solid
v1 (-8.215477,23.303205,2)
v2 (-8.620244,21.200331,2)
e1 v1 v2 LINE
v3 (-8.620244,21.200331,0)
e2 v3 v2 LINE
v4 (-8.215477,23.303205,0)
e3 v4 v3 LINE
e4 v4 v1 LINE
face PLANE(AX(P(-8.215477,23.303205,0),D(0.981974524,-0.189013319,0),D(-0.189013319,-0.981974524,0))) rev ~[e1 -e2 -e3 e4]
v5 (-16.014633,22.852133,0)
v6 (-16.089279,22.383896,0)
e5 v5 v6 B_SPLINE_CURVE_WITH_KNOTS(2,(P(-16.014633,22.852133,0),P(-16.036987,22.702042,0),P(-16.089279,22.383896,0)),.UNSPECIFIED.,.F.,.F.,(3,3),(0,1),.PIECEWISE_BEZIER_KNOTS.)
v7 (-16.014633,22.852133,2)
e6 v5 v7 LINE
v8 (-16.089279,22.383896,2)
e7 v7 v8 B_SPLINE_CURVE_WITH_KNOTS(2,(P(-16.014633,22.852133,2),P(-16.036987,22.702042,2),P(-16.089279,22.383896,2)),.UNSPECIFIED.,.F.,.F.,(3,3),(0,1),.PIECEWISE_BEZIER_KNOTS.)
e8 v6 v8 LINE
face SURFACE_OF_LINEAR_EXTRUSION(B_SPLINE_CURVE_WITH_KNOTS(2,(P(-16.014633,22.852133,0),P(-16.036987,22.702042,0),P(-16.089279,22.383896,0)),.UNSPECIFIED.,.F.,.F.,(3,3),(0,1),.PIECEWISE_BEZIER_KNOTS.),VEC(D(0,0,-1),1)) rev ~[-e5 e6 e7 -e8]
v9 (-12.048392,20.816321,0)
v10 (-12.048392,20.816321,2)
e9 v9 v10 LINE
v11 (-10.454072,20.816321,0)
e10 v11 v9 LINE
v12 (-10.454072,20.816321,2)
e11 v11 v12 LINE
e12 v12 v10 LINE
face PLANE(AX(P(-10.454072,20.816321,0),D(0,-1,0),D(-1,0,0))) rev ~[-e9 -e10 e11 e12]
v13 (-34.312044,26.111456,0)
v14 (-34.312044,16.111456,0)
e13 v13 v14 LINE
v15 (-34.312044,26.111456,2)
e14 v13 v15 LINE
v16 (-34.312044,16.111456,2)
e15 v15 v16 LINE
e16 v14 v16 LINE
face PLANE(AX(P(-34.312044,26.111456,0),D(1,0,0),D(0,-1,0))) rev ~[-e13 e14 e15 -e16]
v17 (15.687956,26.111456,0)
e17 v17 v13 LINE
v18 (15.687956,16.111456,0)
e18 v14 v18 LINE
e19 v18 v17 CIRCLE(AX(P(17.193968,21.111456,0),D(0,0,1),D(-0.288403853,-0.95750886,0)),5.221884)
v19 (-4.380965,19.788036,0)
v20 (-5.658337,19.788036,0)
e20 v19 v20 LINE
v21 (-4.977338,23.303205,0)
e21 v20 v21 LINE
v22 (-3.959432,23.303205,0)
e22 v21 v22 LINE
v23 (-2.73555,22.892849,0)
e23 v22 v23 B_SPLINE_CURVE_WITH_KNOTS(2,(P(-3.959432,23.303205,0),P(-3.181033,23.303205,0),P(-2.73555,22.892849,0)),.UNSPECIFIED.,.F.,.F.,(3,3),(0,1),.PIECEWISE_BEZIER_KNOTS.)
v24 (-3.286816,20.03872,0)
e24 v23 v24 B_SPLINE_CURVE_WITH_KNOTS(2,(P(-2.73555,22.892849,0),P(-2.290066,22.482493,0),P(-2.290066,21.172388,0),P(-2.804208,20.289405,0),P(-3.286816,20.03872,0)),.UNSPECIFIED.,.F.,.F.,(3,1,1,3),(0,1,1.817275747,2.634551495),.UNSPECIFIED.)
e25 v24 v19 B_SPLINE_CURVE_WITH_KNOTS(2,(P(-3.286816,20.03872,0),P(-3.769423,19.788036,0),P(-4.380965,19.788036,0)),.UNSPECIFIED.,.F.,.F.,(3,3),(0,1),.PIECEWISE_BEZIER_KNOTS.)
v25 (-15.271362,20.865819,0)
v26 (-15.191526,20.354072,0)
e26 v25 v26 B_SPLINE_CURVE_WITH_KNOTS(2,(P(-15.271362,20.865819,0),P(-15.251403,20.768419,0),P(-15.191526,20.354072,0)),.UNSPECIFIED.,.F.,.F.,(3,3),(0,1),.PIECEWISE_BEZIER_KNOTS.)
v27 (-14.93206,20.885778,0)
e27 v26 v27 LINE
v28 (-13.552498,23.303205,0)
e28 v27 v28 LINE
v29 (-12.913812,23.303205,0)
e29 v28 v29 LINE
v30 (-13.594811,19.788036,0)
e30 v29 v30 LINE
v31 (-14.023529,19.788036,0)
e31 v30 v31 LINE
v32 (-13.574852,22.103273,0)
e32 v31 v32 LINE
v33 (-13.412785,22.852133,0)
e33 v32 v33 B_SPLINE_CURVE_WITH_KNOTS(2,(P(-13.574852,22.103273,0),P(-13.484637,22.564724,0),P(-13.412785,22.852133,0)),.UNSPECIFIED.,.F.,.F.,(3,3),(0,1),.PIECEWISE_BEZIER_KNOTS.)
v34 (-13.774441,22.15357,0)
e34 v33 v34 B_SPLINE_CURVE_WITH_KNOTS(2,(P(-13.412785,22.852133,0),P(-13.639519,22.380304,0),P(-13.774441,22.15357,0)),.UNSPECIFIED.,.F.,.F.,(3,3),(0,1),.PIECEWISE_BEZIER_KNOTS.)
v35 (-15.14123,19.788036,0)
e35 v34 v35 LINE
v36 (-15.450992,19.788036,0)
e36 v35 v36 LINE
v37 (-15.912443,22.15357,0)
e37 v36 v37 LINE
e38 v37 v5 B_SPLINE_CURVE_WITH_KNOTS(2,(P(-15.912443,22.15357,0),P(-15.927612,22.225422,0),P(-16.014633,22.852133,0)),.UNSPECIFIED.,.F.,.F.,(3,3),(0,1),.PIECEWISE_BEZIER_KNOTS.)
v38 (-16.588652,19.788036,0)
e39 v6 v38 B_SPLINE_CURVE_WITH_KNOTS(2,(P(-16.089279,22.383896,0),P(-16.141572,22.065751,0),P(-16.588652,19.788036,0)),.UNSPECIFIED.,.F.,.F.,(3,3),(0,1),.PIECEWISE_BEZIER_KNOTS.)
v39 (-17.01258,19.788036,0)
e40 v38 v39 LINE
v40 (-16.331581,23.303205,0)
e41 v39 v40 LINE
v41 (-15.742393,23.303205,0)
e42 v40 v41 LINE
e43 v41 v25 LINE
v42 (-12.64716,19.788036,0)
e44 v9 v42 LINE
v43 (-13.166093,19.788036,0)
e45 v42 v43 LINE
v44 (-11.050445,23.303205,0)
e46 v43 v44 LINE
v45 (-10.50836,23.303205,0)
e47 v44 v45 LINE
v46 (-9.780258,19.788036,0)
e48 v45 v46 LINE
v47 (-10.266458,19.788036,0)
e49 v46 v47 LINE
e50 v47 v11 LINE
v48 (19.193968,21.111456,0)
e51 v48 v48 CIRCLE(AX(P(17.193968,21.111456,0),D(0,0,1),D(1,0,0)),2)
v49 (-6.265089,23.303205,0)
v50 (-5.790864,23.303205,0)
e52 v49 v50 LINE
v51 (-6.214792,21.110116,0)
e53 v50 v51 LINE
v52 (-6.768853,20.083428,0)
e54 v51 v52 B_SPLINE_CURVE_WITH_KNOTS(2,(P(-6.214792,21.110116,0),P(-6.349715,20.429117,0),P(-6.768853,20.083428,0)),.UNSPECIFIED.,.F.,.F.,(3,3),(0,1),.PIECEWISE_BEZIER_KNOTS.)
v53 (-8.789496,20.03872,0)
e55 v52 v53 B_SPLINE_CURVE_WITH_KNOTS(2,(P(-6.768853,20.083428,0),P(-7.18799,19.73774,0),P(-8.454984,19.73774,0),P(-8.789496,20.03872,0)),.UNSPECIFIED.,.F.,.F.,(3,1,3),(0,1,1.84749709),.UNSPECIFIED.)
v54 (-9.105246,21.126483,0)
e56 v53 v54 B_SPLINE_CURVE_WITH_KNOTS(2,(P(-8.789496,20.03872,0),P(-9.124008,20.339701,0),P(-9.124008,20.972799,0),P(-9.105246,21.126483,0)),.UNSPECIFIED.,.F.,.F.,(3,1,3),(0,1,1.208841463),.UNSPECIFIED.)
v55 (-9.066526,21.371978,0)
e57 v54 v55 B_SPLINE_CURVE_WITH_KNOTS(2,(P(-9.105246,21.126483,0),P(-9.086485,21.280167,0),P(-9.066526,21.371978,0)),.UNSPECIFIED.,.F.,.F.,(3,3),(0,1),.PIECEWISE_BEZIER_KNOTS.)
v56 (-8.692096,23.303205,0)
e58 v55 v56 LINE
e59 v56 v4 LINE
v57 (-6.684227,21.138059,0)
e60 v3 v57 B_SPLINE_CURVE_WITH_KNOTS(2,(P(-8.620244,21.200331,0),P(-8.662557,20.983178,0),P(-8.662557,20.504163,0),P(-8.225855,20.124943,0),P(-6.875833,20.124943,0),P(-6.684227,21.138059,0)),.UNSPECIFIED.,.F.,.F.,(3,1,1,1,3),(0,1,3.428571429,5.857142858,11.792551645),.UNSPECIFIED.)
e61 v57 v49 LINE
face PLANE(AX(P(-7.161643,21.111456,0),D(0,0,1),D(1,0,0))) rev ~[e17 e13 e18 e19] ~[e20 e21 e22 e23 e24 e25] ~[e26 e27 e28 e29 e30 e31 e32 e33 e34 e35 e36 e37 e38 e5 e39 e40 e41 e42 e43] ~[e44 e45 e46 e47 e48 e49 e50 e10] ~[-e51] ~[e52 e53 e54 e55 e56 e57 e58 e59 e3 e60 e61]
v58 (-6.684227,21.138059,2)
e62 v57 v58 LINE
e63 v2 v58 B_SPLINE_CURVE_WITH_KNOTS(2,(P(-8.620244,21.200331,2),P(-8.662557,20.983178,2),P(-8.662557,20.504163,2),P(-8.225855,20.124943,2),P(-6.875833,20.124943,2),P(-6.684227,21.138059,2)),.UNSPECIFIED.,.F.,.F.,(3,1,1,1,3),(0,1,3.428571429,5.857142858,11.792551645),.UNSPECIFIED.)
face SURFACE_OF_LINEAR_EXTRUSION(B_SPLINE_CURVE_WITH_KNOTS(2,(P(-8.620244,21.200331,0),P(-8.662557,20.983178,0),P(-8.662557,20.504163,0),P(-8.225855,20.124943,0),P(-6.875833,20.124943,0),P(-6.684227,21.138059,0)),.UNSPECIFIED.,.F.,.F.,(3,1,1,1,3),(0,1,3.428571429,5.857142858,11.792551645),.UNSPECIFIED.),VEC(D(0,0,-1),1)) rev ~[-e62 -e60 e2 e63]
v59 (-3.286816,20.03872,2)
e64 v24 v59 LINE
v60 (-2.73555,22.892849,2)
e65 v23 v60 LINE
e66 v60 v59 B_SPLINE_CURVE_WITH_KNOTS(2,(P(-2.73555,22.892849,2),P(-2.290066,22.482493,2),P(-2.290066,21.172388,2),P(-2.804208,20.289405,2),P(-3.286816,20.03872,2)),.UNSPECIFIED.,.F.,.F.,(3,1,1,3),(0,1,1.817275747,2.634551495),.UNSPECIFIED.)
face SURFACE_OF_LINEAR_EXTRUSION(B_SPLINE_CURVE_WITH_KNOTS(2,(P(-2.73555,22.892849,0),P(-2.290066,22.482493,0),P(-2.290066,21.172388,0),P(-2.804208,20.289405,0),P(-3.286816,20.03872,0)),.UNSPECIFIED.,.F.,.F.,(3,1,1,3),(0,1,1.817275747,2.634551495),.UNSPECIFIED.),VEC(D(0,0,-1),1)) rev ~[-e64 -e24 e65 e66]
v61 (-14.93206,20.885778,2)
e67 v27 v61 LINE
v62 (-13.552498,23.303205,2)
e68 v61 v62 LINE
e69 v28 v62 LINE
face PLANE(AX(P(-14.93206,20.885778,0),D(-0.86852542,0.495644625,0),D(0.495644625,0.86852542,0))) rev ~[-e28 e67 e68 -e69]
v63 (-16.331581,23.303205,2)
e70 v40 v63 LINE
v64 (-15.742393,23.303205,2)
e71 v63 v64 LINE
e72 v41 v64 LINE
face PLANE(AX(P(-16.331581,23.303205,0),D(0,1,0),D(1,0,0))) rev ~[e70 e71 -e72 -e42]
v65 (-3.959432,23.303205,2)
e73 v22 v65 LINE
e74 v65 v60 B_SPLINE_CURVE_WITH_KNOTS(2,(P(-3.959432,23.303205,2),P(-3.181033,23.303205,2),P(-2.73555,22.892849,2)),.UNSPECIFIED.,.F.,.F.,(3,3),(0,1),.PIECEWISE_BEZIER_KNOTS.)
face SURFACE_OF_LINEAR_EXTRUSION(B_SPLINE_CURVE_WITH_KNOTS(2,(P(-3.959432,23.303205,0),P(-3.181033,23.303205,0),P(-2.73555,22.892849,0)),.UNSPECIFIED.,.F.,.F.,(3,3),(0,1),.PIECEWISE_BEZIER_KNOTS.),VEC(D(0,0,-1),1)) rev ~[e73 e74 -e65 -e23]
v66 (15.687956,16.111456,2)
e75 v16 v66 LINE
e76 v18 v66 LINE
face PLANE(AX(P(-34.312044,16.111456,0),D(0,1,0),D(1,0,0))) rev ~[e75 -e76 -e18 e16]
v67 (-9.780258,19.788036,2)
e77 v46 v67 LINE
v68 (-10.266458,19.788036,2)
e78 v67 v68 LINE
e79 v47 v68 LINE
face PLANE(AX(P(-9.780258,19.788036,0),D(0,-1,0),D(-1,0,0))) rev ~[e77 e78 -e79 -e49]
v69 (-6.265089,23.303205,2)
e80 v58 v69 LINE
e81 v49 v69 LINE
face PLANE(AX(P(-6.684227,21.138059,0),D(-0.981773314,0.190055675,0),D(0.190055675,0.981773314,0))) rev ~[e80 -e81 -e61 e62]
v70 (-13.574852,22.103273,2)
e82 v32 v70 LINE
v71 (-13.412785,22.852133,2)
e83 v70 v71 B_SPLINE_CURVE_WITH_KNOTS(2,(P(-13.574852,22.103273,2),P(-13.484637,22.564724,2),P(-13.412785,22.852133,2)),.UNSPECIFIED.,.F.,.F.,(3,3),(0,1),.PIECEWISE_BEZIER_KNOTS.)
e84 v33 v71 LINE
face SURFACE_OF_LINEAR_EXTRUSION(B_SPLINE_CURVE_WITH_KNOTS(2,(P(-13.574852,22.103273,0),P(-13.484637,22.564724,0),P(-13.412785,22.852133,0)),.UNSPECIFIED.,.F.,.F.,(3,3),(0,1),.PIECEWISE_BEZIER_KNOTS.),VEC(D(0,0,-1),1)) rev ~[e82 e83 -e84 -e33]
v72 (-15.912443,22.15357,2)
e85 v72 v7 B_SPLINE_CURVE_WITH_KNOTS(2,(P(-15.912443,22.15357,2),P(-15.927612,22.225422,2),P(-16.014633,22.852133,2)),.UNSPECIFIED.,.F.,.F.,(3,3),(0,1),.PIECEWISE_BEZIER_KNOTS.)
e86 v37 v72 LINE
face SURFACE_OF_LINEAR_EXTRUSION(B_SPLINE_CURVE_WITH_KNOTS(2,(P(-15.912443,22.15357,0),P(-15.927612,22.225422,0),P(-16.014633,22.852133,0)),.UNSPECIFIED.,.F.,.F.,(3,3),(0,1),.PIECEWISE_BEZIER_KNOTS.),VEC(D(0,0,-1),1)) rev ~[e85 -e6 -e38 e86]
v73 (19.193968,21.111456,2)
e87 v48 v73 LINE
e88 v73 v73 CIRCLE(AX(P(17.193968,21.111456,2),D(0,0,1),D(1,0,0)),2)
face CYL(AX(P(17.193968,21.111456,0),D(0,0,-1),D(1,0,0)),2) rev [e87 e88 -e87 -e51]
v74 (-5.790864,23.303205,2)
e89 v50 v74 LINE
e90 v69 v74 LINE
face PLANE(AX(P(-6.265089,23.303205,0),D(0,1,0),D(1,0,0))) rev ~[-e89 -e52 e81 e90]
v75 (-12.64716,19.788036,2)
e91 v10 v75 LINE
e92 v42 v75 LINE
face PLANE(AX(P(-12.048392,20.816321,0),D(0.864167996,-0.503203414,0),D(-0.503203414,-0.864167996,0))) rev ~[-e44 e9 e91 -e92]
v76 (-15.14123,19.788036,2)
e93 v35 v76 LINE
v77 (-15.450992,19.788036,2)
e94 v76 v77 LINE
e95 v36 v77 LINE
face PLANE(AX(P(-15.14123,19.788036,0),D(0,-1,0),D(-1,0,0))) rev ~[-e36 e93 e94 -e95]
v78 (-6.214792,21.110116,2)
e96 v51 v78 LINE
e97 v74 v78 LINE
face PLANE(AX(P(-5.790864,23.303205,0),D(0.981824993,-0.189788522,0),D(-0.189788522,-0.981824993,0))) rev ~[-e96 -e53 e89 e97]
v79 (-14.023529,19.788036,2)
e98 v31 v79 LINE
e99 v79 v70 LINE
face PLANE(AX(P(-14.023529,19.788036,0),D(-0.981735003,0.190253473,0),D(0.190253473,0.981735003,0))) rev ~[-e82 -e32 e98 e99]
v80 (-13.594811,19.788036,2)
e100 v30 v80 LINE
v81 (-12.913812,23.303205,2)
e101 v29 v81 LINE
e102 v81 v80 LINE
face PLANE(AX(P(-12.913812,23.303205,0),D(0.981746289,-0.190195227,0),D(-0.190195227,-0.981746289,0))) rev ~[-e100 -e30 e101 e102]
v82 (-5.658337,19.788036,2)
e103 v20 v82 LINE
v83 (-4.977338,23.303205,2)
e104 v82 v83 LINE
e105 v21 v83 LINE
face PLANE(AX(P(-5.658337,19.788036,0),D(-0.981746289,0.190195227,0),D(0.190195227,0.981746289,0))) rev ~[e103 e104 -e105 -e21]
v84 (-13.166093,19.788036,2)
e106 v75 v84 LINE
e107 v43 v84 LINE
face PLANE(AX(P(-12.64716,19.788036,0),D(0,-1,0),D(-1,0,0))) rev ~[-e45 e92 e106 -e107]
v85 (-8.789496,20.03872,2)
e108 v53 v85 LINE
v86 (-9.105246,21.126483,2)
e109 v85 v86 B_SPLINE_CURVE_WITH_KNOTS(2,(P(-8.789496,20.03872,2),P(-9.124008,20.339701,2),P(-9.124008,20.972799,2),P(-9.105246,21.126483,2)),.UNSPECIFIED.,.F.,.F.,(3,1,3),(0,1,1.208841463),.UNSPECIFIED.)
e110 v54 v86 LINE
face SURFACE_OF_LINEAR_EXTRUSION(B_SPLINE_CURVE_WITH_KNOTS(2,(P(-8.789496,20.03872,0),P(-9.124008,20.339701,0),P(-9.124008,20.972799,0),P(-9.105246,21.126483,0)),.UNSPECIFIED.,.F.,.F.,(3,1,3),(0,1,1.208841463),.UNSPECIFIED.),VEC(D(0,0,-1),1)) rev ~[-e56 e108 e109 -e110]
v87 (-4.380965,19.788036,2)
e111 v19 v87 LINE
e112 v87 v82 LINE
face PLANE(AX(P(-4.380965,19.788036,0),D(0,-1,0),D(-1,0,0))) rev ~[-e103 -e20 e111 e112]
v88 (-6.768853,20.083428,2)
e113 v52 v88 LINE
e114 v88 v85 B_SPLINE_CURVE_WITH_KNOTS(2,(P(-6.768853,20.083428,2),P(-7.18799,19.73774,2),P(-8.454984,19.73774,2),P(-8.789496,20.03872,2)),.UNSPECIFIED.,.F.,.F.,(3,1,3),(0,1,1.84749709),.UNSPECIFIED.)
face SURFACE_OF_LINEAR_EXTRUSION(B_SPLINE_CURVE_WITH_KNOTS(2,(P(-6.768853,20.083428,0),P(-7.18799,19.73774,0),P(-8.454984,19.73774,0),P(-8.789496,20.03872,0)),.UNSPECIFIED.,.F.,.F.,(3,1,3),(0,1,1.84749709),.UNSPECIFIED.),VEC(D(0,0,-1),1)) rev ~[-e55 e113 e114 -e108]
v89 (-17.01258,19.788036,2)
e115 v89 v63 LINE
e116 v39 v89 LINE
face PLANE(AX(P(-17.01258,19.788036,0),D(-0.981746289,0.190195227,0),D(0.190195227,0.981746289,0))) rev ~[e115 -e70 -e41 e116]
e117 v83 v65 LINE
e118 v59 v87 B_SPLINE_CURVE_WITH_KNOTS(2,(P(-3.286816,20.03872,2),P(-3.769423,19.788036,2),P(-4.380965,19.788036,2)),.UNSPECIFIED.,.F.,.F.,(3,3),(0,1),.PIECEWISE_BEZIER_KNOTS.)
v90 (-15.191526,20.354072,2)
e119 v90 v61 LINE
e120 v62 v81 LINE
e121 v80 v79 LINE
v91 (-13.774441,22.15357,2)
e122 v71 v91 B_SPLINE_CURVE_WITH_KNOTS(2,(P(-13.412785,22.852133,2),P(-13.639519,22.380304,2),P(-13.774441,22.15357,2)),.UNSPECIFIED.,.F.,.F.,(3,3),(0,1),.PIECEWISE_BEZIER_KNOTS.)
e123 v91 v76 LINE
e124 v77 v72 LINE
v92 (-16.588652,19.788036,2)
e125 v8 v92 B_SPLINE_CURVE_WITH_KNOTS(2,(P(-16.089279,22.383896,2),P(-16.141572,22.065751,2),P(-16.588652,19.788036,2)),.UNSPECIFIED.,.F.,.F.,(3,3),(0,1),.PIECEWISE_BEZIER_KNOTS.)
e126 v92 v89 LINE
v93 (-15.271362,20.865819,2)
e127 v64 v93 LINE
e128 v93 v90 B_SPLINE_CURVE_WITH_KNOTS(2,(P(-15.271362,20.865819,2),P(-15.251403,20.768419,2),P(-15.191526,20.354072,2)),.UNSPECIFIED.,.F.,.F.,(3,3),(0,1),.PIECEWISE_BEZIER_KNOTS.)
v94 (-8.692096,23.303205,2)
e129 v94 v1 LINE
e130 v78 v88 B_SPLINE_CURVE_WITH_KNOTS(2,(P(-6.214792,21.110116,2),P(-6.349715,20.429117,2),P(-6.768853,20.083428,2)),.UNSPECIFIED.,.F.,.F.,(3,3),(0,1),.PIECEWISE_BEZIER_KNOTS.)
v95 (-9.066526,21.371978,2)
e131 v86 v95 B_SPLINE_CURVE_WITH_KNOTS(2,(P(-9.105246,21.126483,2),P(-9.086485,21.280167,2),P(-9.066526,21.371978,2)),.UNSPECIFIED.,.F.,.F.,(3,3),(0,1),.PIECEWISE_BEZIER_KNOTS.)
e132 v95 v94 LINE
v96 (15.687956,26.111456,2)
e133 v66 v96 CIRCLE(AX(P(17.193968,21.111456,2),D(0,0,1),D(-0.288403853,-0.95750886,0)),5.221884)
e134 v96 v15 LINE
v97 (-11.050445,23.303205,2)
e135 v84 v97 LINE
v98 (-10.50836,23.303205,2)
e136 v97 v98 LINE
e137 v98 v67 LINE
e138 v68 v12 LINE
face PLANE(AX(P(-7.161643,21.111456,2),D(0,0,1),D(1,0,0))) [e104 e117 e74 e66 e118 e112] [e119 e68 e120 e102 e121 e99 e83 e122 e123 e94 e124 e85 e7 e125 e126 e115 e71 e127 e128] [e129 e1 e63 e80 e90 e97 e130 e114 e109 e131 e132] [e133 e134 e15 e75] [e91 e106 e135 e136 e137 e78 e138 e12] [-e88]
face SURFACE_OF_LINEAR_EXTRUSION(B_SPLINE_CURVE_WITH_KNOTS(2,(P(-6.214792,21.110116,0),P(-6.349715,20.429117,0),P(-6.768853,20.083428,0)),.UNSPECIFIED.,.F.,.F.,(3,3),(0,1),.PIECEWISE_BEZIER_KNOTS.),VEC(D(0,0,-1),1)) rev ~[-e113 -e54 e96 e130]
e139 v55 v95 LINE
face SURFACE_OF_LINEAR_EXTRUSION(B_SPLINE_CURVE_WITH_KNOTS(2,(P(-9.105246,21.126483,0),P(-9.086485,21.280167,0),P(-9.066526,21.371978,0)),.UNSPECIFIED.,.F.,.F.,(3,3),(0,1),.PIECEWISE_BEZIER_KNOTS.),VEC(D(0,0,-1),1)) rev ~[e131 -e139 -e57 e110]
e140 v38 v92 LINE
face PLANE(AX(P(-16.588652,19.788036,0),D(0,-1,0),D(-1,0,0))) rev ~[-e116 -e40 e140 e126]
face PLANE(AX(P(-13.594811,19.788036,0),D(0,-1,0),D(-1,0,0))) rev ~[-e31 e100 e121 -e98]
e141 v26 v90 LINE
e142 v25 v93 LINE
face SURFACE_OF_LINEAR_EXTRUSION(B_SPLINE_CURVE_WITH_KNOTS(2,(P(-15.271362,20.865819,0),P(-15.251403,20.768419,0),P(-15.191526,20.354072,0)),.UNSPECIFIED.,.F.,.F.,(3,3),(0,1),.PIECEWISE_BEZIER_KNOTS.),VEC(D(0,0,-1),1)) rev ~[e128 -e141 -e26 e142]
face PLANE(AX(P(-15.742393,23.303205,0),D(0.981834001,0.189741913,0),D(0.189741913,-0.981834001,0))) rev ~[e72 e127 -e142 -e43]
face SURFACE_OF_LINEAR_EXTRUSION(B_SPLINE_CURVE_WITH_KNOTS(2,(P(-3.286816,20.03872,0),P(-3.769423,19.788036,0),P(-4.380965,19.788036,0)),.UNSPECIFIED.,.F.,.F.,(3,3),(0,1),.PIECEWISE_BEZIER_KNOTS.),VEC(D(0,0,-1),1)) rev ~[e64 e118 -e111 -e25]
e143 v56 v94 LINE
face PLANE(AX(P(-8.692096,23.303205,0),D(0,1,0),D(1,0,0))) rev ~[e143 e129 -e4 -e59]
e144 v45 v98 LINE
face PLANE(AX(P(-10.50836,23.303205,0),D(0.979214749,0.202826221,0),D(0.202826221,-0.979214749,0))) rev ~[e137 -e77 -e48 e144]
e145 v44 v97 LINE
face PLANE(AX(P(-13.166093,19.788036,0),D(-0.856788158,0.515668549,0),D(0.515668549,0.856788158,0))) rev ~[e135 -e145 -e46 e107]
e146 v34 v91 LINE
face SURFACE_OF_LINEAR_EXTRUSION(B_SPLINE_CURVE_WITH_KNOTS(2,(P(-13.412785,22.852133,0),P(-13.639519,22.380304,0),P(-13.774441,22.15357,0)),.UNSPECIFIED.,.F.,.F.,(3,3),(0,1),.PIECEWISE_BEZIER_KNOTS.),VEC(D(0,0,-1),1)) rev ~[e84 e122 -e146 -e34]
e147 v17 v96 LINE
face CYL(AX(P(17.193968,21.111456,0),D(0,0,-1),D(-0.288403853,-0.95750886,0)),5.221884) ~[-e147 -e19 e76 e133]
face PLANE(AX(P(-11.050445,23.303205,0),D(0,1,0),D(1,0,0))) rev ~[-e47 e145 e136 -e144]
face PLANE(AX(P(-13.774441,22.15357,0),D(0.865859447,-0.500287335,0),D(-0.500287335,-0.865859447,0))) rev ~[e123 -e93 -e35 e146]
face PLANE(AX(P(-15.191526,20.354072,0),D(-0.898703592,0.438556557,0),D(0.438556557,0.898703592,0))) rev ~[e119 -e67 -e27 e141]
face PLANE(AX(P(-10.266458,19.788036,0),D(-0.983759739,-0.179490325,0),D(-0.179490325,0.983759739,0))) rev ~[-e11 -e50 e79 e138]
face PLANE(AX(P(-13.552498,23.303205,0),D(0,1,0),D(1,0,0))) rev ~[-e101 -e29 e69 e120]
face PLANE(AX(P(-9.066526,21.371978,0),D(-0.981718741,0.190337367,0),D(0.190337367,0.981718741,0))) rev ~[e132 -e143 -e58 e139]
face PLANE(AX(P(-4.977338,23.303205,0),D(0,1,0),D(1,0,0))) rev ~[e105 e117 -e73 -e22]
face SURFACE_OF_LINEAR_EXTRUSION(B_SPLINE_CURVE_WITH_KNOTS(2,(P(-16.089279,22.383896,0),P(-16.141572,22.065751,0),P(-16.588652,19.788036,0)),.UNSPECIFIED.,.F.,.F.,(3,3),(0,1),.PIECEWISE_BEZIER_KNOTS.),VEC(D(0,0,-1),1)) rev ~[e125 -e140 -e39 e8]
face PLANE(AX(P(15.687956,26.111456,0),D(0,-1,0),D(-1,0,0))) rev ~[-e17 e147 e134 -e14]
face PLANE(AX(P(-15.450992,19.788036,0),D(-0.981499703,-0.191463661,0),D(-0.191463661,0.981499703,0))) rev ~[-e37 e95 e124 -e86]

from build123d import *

# Parameters (mm, degrees)
F0_R     = 2
F1_DEPTH = 2


with BuildPart() as f1:
    # F0 (on Top) → F1 (new body)
    with BuildSketch(Plane.XY):
        with BuildLine():
            Line((15.6879561022, 26.1114555106), (-34.3120438978, 26.1114555106))
            Line((-34.3120438978, 26.1114555106), (-34.3120438978, 16.1114555106))
            Line((-34.3120438978, 16.1114555106), (15.6879561022, 16.1114555106))
            ThreePointArc((15.6879561022, 16.1114555106), (22.4158513012, 21.1114555106), (15.6879561022, 26.1114555106))
        make_face()
        with Locations((17.1939675076, 21.1114555106)):
            Circle(F0_R, mode=Mode.SUBTRACT)
        with BuildLine():
            Line((-13.594810762, 19.7880361229), (-14.0235288377, 19.7880361229))
            Line((-14.0235288377, 19.7880361229), (-13.5748518199, 22.1032734035))
            add(Edge.make_bspline(
                [(-13.5748518199, 22.1032734035), (-13.4846374017, 22.5647241443), (-13.4127852103, 22.8521329102)],
                knots=[0, 0, 0, 1, 1, 1], degree=2))
            add(Edge.make_bspline(
                [(-13.4127852103, 22.8521329102), (-13.6395187922, 22.3803035195), (-13.7744412407, 22.1535699376)],
                knots=[0, 0, 0, 1, 1, 1], degree=2))
            Line((-13.7744412407, 22.1535699376), (-15.1412295939, 19.7880361229))
            Line((-15.1412295939, 19.7880361229), (-15.4509923749, 19.7880361229))
            Line((-15.4509923749, 19.7880361229), (-15.9124431157, 22.1535699376))
            add(Edge.make_bspline(
                [(-15.9124431157, 22.1535699376), (-15.9276119116, 22.225422129), (-16.0146328991, 22.8521329102)],
                knots=[0, 0, 0, 1, 1, 1], degree=2))
            add(Edge.make_bspline(
                [(-16.0146328991, 22.8521329102), (-16.0369869142, 22.7020416658), (-16.0892793424, 22.3838961291)],
                knots=[0, 0, 0, 1, 1, 1], degree=2))
            add(Edge.make_bspline(
                [(-16.0892793424, 22.3838961291), (-16.1415717707, 22.0657505924), (-16.5886520731, 19.7880361229)],
                knots=[0, 0, 0, 1, 1, 1], degree=2))
            Line((-16.5886520731, 19.7880361229), (-17.0125800028, 19.7880361229))
            Line((-17.0125800028, 19.7880361229), (-16.3315808992, 23.3032050011))
            Line((-16.3315808992, 23.3032050011), (-15.7423929292, 23.3032050011))
            Line((-15.7423929292, 23.3032050011), (-15.2713618962, 20.8658189949))
            add(Edge.make_bspline(
                [(-15.2713618962, 20.8658189949), (-15.2514029542, 20.7684193576), (-15.1915261279, 20.3540717201)],
                knots=[0, 0, 0, 1, 1, 1], degree=2))
            Line((-15.1915261279, 20.3540717201), (-14.932059881, 20.885777937))
            Line((-14.932059881, 20.885777937), (-13.5524978048, 23.3032050011))
            Line((-13.5524978048, 23.3032050011), (-12.9138116584, 23.3032050011))
            Line((-12.9138116584, 23.3032050011), (-13.594810762, 19.7880361229))
        make_face(mode=Mode.SUBTRACT)
        Polygon((-9.7802577527, 19.7880361229), (-10.2664575817, 19.7880361229), (-10.4540716372, 20.8163208186), (-12.0483919301, 20.8163208186), (-12.6471601923, 19.7880361229), (-13.1660926862, 19.7880361229), (-11.0504448263, 23.3032050011), (-10.5083599596, 23.3032050011), align=None, mode=Mode.SUBTRACT)
        with BuildLine():
            add(Edge.make_bspline(
                [(-6.7688525726, 20.0834284656), (-7.1879903561, 19.7377395889), (-7.8737796058, 19.7377395889)],
                knots=[0, 0, 0, 1, 1, 1], degree=2))
            add(Edge.make_bspline(
                [(-7.8737796058, 19.7377395889), (-8.454983999, 19.7377395889), (-8.7894958682, 20.0387204354)],
                knots=[0, 0, 0, 1, 1, 1], degree=2))
            add(Edge.make_bspline(
                [(-8.7894958682, 20.0387204354), (-9.1240077373, 20.3397012819), (-9.1240077373, 20.8634239219)],
                knots=[0, 0, 0, 1, 1, 1], degree=2))
            add(Edge.make_bspline(
                [(-9.1240077373, 20.8634239219), (-9.1240077373, 20.9727989245), (-9.1052463318, 21.1264827784)],
                knots=[0, 0, 0, 1, 1, 1], degree=2))
            add(Edge.make_bspline(
                [(-9.1052463318, 21.1264827784), (-9.0864849262, 21.2801666324), (-9.0665259842, 21.3719777659)],
                knots=[0, 0, 0, 1, 1, 1], degree=2))
            Line((-9.0665259842, 21.3719777659), (-8.6920962308, 23.3032050011))
            Line((-8.6920962308, 23.3032050011), (-8.2154766941, 23.3032050011))
            Line((-8.2154766941, 23.3032050011), (-8.6202440394, 21.2003308641))
            add(Edge.make_bspline(
                [(-8.6202440394, 21.2003308641), (-8.6625569966, 20.9831775743), (-8.6625569966, 20.8434649798)],
                knots=[0, 0, 0, 1, 1, 1], degree=2))
            add(Edge.make_bspline(
                [(-8.6625569966, 20.8434649798), (-8.6625569966, 20.5041629645), (-8.4442061703, 20.3145530148)],
                knots=[0, 0, 0, 1, 1, 1], degree=2))
            add(Edge.make_bspline(
                [(-8.4442061703, 20.3145530148), (-8.225855344, 20.1249430651), (-7.8338617216, 20.1249430651)],
                knots=[0, 0, 0, 1, 1, 1], degree=2))
            add(Edge.make_bspline(
                [(-7.8338617216, 20.1249430651), (-6.8758325021, 20.1249430651), (-6.6842266582, 21.1380589648)],
                knots=[0, 0, 0, 1, 1, 1], degree=2))
            Line((-6.6842266582, 21.1380589648), (-6.2650888746, 23.3032050011))
            Line((-6.2650888746, 23.3032050011), (-5.7908644109, 23.3032050011))
            Line((-5.7908644109, 23.3032050011), (-6.2147923406, 21.1101164459))
            add(Edge.make_bspline(
                [(-6.2147923406, 21.1101164459), (-6.349714789, 20.4291173423), (-6.7688525726, 20.0834284656)],
                knots=[0, 0, 0, 1, 1, 1], degree=2))
        make_face(mode=Mode.SUBTRACT)
        with BuildLine():
            Line((-4.977337932, 23.3032050011), (-3.9594318862, 23.3032050011))
            add(Edge.make_bspline(
                [(-3.9594318862, 23.3032050011), (-3.1810331453, 23.3032050011), (-2.7355495582, 22.892849152)],
                knots=[0, 0, 0, 1, 1, 1], degree=2))
            add(Edge.make_bspline(
                [(-2.7355495582, 22.892849152), (-2.2900659711, 22.482493303), (-2.2900659711, 21.7615763152)],
                knots=[0, 0, 0, 1, 1, 1], degree=2))
            add(Edge.make_bspline(
                [(-2.2900659711, 21.7615763152), (-2.2900659711, 21.1723883452), (-2.547137145, 20.7308965465)],
                knots=[0, 0, 0, 1, 1, 1], degree=2))
            add(Edge.make_bspline(
                [(-2.547137145, 20.7308965465), (-2.8042083189, 20.2894047478), (-3.2868155383, 20.0387204354)],
                knots=[0, 0, 0, 1, 1, 1], degree=2))
            add(Edge.make_bspline(
                [(-3.2868155383, 20.0387204354), (-3.7694227576, 19.7880361229), (-4.3809647428, 19.7880361229)],
                knots=[0, 0, 0, 1, 1, 1], degree=2))
            Line((-4.3809647428, 19.7880361229), (-5.6583370355, 19.7880361229))
            Line((-5.6583370355, 19.7880361229), (-4.977337932, 23.3032050011))
        make_face(mode=Mode.SUBTRACT)
    extrude(amount=F1_DEPTH)


solid = f1.part
